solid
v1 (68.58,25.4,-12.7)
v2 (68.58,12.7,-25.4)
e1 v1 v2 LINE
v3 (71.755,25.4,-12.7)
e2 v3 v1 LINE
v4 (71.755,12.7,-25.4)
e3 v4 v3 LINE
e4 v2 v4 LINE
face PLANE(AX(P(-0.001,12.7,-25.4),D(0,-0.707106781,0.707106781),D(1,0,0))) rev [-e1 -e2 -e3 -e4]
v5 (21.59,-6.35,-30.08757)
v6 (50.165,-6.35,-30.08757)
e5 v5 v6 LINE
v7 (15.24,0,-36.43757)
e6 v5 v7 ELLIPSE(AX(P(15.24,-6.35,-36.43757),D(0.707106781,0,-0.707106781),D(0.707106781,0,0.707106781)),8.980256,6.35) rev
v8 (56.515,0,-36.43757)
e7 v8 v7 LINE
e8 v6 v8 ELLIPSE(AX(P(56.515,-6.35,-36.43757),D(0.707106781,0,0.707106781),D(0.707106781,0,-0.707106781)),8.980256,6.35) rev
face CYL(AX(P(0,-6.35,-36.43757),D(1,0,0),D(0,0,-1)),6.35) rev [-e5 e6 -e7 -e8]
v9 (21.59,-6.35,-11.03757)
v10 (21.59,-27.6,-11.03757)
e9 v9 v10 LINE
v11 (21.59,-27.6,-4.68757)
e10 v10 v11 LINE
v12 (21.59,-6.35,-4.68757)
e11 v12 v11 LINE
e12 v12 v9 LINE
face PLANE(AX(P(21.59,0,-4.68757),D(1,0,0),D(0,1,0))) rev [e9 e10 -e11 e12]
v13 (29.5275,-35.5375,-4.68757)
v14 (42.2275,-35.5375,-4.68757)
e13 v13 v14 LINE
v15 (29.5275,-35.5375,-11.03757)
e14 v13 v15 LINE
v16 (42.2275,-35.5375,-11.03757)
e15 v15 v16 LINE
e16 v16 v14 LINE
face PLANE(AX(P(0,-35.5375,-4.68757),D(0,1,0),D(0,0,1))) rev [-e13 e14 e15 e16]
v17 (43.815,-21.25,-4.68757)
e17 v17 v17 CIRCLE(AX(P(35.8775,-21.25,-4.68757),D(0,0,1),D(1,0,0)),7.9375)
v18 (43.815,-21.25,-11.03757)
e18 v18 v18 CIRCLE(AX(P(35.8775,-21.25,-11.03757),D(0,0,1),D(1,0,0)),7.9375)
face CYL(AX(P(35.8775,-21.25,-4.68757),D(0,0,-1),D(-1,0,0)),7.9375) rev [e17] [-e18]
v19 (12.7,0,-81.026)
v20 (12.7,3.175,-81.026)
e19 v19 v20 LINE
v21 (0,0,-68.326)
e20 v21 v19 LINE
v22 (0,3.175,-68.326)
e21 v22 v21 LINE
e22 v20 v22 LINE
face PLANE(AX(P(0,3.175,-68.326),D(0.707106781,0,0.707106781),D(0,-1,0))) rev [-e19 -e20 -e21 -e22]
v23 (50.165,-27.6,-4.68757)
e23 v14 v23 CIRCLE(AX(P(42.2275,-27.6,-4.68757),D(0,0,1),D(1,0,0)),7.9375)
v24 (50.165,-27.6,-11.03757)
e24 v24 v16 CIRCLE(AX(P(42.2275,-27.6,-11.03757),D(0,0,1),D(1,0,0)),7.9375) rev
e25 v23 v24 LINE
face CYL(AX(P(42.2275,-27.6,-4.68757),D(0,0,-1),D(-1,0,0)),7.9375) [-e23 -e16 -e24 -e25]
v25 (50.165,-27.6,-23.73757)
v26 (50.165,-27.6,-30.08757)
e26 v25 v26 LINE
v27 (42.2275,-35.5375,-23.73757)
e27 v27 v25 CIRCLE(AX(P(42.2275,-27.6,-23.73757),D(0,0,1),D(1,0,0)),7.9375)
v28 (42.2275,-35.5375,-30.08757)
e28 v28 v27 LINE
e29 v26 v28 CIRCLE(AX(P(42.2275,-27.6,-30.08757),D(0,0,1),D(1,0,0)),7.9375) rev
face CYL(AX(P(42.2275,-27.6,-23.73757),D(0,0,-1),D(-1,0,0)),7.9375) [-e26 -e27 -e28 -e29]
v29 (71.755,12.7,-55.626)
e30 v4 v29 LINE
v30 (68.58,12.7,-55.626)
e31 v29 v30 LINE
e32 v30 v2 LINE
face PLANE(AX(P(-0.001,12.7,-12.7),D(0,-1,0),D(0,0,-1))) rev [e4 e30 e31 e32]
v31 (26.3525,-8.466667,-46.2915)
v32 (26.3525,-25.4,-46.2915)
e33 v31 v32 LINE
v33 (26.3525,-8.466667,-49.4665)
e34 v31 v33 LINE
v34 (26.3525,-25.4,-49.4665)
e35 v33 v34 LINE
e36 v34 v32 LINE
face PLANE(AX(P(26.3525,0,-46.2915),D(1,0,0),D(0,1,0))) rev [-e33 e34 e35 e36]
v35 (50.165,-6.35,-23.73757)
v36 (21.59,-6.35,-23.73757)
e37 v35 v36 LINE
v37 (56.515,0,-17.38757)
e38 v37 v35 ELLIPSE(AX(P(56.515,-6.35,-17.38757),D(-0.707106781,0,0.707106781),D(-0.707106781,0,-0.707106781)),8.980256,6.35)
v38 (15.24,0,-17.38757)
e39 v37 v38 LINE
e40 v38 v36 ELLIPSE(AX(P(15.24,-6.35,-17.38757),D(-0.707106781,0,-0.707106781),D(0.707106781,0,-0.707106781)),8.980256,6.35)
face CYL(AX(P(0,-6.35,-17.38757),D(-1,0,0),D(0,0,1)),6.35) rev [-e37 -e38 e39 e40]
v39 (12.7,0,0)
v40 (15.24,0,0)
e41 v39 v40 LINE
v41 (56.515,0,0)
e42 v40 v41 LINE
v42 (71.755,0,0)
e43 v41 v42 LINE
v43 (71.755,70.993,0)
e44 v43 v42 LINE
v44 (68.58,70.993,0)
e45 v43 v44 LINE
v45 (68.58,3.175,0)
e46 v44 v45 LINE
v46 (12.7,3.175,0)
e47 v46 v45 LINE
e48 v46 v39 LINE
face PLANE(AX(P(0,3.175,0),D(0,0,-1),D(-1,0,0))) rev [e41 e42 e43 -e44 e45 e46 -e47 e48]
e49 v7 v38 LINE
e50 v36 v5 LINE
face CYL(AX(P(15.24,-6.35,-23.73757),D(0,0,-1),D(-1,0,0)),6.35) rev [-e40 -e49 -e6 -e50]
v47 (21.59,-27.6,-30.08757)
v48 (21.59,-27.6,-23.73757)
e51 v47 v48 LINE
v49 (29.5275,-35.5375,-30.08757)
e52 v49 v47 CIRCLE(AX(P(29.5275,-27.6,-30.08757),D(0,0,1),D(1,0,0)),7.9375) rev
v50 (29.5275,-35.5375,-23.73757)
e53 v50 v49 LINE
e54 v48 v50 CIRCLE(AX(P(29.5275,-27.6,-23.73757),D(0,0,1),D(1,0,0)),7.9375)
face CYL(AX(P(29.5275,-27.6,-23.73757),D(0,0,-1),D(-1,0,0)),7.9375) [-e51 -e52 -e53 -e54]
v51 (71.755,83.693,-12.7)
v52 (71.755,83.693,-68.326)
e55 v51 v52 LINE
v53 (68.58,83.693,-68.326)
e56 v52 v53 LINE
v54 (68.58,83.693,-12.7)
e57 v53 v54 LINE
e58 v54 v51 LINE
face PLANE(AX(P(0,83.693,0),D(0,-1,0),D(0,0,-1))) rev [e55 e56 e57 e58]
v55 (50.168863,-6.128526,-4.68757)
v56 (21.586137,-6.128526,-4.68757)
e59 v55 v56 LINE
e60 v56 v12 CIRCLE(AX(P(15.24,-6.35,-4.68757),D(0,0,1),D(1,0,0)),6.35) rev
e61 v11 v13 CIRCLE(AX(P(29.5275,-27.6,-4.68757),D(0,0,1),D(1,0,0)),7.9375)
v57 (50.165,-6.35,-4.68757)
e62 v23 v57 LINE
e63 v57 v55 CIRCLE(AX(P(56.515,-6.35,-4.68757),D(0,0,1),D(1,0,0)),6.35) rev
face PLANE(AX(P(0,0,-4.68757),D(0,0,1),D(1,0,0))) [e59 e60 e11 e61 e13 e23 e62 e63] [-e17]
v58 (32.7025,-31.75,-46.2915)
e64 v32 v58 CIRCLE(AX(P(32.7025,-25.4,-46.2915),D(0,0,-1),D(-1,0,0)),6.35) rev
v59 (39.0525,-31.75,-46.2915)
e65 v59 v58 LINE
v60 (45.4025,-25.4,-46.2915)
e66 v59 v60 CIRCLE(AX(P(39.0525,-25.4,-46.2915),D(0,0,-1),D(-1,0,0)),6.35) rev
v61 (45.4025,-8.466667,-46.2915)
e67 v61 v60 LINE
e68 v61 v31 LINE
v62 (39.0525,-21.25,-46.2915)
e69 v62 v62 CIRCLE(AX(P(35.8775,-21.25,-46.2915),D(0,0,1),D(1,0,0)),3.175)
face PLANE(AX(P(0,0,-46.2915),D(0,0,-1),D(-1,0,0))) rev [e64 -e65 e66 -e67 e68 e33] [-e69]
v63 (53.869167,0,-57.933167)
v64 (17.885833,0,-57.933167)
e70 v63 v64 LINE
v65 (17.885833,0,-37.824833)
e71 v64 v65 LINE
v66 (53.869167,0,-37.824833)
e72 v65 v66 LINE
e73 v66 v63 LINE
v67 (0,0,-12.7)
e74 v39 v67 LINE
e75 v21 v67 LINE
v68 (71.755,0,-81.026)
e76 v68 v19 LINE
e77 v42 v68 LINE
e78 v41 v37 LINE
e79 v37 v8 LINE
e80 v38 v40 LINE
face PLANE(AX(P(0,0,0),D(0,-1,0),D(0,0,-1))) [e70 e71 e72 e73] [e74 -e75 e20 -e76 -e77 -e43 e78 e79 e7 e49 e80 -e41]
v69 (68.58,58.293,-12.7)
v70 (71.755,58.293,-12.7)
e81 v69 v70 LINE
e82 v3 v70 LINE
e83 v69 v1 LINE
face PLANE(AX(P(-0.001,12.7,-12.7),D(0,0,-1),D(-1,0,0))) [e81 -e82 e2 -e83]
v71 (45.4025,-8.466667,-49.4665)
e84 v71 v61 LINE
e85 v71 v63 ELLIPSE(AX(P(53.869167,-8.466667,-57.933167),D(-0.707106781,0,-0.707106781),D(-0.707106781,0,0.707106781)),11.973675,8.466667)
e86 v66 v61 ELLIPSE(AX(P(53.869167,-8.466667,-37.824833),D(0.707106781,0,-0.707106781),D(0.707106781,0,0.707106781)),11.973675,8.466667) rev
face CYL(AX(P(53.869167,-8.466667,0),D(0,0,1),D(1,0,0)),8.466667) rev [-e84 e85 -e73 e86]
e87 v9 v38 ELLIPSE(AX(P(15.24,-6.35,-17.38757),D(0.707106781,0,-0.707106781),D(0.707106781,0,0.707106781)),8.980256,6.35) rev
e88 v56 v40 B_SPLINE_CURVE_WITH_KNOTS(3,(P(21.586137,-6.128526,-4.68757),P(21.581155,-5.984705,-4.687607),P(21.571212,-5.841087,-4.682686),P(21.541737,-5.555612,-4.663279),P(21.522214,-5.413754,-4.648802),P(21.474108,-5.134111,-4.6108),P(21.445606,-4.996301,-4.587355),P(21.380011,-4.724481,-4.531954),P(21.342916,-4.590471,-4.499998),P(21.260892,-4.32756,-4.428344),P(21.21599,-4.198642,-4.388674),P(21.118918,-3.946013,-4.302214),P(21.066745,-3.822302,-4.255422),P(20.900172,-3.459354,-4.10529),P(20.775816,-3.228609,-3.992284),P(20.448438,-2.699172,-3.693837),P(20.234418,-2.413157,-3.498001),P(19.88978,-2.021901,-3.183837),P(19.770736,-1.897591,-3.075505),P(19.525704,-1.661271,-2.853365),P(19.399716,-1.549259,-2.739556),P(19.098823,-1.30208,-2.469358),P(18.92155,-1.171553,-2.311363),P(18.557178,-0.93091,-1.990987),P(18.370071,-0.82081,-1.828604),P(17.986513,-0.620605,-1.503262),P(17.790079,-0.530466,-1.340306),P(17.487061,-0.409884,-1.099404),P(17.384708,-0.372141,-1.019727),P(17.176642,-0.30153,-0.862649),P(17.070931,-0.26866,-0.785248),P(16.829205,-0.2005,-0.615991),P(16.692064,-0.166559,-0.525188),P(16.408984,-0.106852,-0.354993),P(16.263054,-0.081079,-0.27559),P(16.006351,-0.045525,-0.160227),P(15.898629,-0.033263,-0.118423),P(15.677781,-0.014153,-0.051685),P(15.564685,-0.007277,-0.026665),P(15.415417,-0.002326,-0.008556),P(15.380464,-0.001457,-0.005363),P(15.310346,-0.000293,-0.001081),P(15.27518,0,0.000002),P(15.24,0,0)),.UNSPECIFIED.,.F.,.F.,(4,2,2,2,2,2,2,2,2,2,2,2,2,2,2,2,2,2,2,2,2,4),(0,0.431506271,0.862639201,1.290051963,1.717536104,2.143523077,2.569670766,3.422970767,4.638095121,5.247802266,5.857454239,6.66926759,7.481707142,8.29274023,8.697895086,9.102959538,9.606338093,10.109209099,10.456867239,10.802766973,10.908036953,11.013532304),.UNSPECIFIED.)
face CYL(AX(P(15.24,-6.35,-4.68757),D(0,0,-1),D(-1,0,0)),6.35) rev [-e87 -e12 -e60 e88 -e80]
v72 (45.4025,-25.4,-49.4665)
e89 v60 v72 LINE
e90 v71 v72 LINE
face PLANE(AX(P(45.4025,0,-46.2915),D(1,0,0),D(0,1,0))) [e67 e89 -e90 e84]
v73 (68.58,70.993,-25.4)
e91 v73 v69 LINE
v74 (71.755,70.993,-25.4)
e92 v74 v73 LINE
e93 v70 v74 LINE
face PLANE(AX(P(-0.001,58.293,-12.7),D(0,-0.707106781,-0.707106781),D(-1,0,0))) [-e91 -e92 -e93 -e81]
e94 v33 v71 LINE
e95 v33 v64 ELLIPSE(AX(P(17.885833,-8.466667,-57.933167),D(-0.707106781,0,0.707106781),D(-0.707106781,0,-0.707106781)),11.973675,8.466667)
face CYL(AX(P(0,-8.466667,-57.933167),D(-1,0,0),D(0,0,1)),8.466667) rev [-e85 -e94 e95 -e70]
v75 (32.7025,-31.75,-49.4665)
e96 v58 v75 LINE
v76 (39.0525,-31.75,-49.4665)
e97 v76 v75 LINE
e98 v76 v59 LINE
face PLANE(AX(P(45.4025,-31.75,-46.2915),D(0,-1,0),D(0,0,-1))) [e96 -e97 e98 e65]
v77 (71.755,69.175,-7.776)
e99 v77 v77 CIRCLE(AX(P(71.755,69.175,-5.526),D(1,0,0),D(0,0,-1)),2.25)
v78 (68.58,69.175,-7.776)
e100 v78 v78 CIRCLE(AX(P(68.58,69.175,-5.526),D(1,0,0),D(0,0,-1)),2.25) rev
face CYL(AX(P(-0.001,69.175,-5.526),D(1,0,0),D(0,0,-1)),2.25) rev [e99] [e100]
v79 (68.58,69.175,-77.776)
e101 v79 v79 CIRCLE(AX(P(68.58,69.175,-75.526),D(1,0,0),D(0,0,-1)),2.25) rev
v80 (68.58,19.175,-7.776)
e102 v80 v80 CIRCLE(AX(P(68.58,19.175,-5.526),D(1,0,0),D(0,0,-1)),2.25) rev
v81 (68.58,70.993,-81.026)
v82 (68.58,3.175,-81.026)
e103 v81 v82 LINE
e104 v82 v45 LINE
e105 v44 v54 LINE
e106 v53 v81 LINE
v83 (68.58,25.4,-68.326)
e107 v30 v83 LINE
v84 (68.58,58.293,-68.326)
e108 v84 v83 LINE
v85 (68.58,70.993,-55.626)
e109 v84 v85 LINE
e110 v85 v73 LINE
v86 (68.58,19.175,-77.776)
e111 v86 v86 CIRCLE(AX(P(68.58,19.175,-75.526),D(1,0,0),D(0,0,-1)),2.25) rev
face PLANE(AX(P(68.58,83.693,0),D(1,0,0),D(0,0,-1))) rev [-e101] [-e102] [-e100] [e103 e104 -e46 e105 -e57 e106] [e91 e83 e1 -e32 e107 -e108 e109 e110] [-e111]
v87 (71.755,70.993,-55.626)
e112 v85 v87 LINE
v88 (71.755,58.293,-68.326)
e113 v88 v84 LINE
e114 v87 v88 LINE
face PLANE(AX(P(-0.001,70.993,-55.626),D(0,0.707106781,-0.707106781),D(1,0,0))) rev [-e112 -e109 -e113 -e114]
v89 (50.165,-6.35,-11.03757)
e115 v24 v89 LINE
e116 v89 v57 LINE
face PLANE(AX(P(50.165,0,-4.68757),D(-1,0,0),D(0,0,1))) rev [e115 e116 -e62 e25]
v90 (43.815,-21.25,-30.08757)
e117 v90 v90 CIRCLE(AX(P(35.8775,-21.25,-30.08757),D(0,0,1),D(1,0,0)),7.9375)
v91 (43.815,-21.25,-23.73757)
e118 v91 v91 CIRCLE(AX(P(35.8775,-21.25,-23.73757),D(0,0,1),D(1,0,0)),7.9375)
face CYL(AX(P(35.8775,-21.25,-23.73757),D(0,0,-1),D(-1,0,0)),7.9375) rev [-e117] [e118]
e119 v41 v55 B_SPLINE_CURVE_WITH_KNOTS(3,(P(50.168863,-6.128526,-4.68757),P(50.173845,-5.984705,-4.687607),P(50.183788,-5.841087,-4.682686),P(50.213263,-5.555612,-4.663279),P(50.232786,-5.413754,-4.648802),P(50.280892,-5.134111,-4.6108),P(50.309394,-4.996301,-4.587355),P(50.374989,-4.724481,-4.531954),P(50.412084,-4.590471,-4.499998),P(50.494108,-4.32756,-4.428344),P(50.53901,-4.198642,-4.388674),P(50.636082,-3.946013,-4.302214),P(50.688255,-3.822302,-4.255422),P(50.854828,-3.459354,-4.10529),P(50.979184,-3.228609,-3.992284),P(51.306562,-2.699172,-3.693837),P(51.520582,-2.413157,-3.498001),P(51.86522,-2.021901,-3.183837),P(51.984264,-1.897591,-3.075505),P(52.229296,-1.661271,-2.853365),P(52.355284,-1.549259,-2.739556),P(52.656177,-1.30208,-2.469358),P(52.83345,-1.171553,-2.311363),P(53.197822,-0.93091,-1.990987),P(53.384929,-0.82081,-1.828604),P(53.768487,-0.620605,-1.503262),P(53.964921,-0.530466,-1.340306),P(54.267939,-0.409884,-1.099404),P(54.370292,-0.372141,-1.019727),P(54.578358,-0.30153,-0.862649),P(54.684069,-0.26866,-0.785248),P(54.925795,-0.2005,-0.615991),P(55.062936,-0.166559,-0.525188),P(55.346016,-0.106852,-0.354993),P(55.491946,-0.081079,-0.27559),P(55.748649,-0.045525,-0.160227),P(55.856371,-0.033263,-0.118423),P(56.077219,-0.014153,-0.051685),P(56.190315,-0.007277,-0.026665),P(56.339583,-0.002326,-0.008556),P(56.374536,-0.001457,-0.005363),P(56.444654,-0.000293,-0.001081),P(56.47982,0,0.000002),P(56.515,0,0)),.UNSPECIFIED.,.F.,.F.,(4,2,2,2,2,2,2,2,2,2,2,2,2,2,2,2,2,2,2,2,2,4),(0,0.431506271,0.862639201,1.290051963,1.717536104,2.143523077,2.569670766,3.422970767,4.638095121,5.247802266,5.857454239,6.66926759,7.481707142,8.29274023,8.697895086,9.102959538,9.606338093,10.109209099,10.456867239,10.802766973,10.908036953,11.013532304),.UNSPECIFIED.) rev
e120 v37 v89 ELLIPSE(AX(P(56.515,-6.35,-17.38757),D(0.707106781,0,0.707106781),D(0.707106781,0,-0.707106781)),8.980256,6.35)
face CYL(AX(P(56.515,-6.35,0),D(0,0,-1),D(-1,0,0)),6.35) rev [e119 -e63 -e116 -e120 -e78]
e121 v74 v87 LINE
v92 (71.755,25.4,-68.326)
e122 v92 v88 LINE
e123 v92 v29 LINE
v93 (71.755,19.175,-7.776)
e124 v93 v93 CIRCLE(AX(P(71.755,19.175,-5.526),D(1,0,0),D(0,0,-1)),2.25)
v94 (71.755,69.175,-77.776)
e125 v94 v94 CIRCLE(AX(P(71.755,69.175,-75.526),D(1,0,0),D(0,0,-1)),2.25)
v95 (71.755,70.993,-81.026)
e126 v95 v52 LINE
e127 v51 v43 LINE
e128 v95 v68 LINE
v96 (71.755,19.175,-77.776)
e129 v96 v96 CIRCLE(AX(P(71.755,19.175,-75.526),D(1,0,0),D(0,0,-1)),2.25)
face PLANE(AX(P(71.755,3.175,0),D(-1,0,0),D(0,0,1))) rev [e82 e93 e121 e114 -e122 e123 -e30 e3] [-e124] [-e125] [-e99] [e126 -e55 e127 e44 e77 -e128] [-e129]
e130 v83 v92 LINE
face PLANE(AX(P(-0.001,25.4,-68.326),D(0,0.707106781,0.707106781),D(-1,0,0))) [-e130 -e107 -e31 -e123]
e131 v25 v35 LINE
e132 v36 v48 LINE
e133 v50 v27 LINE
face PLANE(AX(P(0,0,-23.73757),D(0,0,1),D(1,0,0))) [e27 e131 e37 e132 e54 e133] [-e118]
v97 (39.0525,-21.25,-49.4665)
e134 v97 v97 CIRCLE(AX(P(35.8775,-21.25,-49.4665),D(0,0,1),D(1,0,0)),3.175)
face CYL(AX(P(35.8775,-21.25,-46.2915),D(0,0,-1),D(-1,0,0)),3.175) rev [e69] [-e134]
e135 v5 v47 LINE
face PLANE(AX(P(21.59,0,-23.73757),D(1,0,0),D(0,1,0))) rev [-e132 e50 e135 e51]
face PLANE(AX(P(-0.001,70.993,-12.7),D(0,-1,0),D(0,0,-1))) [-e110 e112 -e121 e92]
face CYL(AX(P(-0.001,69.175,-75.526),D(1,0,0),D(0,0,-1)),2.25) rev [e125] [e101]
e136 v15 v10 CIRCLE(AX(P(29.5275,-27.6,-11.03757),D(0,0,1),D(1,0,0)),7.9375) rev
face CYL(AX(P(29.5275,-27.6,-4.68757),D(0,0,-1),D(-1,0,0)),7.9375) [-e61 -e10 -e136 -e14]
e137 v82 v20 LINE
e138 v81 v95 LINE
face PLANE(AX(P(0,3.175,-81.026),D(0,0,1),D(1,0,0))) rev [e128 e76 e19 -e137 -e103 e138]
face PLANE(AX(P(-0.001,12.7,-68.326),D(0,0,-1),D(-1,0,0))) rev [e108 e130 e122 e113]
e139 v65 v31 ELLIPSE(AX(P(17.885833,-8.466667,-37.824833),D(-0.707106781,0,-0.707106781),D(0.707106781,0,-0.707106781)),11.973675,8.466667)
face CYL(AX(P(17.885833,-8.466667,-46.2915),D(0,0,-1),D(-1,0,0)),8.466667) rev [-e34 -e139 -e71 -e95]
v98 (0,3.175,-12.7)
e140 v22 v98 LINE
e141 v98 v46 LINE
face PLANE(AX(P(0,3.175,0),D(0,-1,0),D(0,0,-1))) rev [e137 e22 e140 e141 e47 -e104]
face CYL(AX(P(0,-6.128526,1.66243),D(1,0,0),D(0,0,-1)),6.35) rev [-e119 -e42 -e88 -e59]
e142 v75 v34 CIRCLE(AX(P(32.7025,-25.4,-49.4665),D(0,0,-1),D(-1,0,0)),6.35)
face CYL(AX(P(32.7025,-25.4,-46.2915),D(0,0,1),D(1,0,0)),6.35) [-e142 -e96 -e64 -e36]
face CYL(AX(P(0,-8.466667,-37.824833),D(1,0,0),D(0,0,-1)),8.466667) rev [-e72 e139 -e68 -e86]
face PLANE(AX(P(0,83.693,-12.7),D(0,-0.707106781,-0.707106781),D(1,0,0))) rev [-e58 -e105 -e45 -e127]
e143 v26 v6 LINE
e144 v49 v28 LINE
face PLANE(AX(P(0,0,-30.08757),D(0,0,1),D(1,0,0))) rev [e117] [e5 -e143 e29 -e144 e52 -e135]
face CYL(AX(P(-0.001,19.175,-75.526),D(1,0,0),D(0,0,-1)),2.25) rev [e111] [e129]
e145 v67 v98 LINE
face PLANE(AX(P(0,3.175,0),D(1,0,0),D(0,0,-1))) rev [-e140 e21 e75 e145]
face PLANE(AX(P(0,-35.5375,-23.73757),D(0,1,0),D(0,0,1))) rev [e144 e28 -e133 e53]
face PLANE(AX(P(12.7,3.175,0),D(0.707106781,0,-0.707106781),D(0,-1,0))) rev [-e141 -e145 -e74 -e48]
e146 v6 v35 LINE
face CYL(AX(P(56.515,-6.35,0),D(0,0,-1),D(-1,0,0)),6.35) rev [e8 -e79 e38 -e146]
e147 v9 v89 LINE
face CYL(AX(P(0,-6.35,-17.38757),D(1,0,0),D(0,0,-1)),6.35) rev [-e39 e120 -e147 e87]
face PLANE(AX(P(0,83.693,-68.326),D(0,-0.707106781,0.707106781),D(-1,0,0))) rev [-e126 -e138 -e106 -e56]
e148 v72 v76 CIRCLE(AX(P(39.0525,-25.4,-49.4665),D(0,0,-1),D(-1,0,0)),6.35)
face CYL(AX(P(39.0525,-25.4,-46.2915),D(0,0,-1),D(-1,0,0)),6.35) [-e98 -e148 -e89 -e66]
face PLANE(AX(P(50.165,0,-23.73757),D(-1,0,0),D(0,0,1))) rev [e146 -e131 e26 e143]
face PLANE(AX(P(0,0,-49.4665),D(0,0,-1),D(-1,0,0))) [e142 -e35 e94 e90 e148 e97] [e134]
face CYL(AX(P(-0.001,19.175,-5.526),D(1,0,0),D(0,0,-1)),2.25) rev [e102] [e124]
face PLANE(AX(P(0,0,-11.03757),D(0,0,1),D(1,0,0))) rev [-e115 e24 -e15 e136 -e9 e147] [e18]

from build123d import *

# Parameters (mm, degrees)
SKETCH1_W            = 71.755
SKETCH1_H            = 81.026
BOSS_EXTRUDE1_DEPTH  = 3.175
BOSS_EXTRUDE4_DEPTH  = 80.51799999999999
BOSS_EXTRUDE10_START = -7.366
SKETCH8_R            = 3.174999999999998
BOSS_EXTRUDE10_DEPTH = 1.5875
FILLET1_R            = 6.35
FILLET2_R            = 8.466666666666665
CUT_EXTRUDE1_REACH   = 138.816
SKETCH9_W            = 55.626000000000005
SKETCH9_H            = 58.29299999999998
FILLET3_SIZE         = 12.7
CHAMFER1_SIZE        = 12.7
BOSS_EXTRUDE11_START = -11.03757
SKETCH10_R           = 7.937500000000002
BOSS_EXTRUDE11_DEPTH = 6.35
LPATTERN1_COUNT      = 2
LPATTERN1_PITCH      = 19.049999999999997
FILLET4_R            = 6.35
FILLET5_R            = 7.9375
CUT_EXTRUDE2_REACH   = 138.816
SKETCH13_R           = 2.2499999999999964
SKETCH13_R_2         = 2.2500000000000013


with BuildPart() as part:
    # Sketch1 → Boss-Extrude1 (new body)
    with BuildSketch(Plane(origin=(0, 0, 0), x_dir=(1, 0, 0), z_dir=(0, 1, 0))):
        with Locations((35.8775, 40.513)):
            Rectangle(SKETCH1_W, SKETCH1_H)
    extrude(amount=BOSS_EXTRUDE1_DEPTH)

    # Sketch3 → Boss-Extrude4 (add)
    with BuildSketch(Plane(origin=(0, 3.175, 0), x_dir=(1, 0, 0), z_dir=(0, 1, 0))):
        Polygon((71.755, 0), (68.58, -3.9e-16), (68.58, 81.026), (71.755, 81.026), align=None)
    extrude(amount=BOSS_EXTRUDE4_DEPTH)

    # Sketch8 → Boss-Extrude10 (add, symmetric)
    with BuildSketch(Plane.XY.offset(-40.513).offset(BOSS_EXTRUDE10_START)):
        Polygon((26.3525, 0), (26.352499999999996, -31.75), (45.4025, -31.75), (45.402499999999996, 0), align=None)
        with Locations((35.8775, -21.249999999999993)):
            Circle(SKETCH8_R, mode=Mode.SUBTRACT)
    extrude(amount=BOSS_EXTRUDE10_DEPTH, both=True)

    # Fillet1
    fillet1_edges = [part.edges().sort_by_distance(p)[0] for p in [
        (26.352499999999996, -31.75, -47.879),
        (45.4025, -31.75, -47.879),
    ]]
    fillet(fillet1_edges, radius=FILLET1_R)

    # Fillet2
    fillet2_edges = [part.edges().sort_by_distance(p)[0] for p in [
        (35.8775, 0, -49.466499999999996),
        (26.3525, 0, -47.879),
        (35.8775, 0, -46.2915),
        (45.402499999999996, 0, -47.879),
    ]]
    fillet(fillet2_edges, radius=FILLET2_R)

    # Sketch9 → Cut-Extrude1 (cut, up to next)
    with BuildSketch(Plane(origin=(71.755, 0, 0), x_dir=(0, 0, -1), z_dir=(1, 0, 0)), mode=Mode.PRIVATE) as cut_extrude1_sk1:
        with Locations((40.513000000000005, 41.84649999999999)):
            Rectangle(SKETCH9_W, SKETCH9_H)
    cut_extrude1_tool1 = extrude(cut_extrude1_sk1.sketch, amount=-CUT_EXTRUDE1_REACH, mode=Mode.PRIVATE) & part.part
    add(cut_extrude1_tool1.solids().sort_by_distance((71.755, 41.8465, -40.513))[0], mode=Mode.SUBTRACT)

    # Fillet3
    fillet3_edges = [part.edges().sort_by_distance(p)[0] for p in [
        (70.16749999999999, 83.69299999999998, -81.026),
        (70.16749999999999, 83.69299999999998, 1.9e-16),
        (0, 1.5875, -81.026),
        (0, 1.5875, 0),
    ]]
    chamfer(fillet3_edges, length=FILLET3_SIZE)

    # Chamfer1
    chamfer1_edges = [part.edges().sort_by_distance(p)[0] for p in [
        (70.16749999999999, 70.99299999999998, -12.700000000000003),
        (70.16749999999999, 70.99299999999998, -68.32600000000001),
        (70.16749999999999, 12.700000000000006, -68.32600000000001),
        (70.16749999999999, 12.700000000000006, -12.700000000000003),
    ]]
    chamfer(chamfer1_edges, length=CHAMFER1_SIZE)

    # Sketch10 → Boss-Extrude11 (add)
    with BuildSketch(Plane.XY.offset(BOSS_EXTRUDE11_START)):
        Polygon((21.589999999999996, 0), (21.59, -35.537499999999994), (50.165, -35.537499999999994), (50.165, 0), align=None)
        with Locations((35.8775, -21.249999999999993)):
            Circle(SKETCH10_R, mode=Mode.SUBTRACT)
    boss_extrude11 = extrude(amount=BOSS_EXTRUDE11_DEPTH)

    # LPattern1: Boss-Extrude11 ×2
    with Locations(*[(0, 0, -i * LPATTERN1_PITCH) for i in range(1, LPATTERN1_COUNT)]):
        add(boss_extrude11)

    # Fillet4
    # the kernel refuses this fillet: 6.35 mm, written as the material it adds along each edge
    with BuildSketch(Plane(origin=(50.165, 0, -4.687570000000001), x_dir=(0, 1.9e-16, 1), z_dir=(-1, 0, 0))) as fillet4_piece_1:
        with BuildLine():
            CenterArc((6.349999999999999, -6.128525637957305), FILLET4_R, 105.17689462009754, 74.82310537990246)
            Line((-1.16e-15, -6.1285256379573045), (-0.12700000000000095, -6.1285256379573045))
            Line((-0.12700000000000095, -6.1285256379573045), (-0.12699999999999978, 2e-17))
            Line((-0.12699999999999978, 2e-17), (2e-17, 0.127))
            ThreePointArc((2e-17, 0.127), (2.343784999999997, 0.12699999999999956), (4.654321400000001, 0.12257051275914613))
            Line((4.654321400000001, 0.12257051275914613), (4.687570000000001, 0))
        make_face()
    extrude(amount=28.575000000000003)
    with BuildSketch(Plane(origin=(50.165, 0, -26.912570000000006), x_dir=(1, 0, 0), z_dir=(0, 0, 1))) as fillet4_piece_2_section:
        with BuildLine():
            CenterArc((FILLET4_R, -FILLET4_R), FILLET4_R, 90, 90)
            Line((0, -FILLET4_R), (-FILLET4_R * 0.02, -FILLET4_R))
            Line((-FILLET4_R * 0.02, -FILLET4_R), (-FILLET4_R * 0.02, FILLET4_R * 0.02))
            Line((-FILLET4_R * 0.02, FILLET4_R * 0.02), (FILLET4_R, FILLET4_R * 0.02))
            Line((FILLET4_R, FILLET4_R * 0.02), (FILLET4_R, 0))
        make_face()
    fillet4_piece_2 = extrude(amount=22.225000000000005, mode=Mode.PRIVATE)
    fillet4_piece_2 = split(fillet4_piece_2, bisect_by=Plane(origin=(51.602608975594336, -1.437608975594344, -23.737569999999998), z_dir=(0, 0, -1)), keep=Keep.TOP, mode=Mode.PRIVATE)
    add(fillet4_piece_2)
    with BuildSketch(Plane(origin=(50.165, 0, -11.03757), x_dir=(1, 0, 0), z_dir=(0, 0, 1))) as fillet4_piece_3:
        with BuildLine():
            CenterArc((FILLET4_R, -FILLET4_R), FILLET4_R, 90, 90)
            Line((0, -FILLET4_R), (-FILLET4_R * 0.02, -FILLET4_R))
            Line((-FILLET4_R * 0.02, -FILLET4_R), (-FILLET4_R * 0.02, FILLET4_R * 0.02))
            Line((-FILLET4_R * 0.02, FILLET4_R * 0.02), (FILLET4_R, FILLET4_R * 0.02))
            Line((FILLET4_R, FILLET4_R * 0.02), (FILLET4_R, 0))
        make_face()
    extrude(amount=6.35)
    with BuildSketch(Plane(origin=(21.589999999999996, 0, -26.912569999999995), x_dir=(-1, 0, 0), z_dir=(0, 0, 1))) as fillet4_piece_4_section:
        with BuildLine():
            CenterArc((FILLET4_R, FILLET4_R), FILLET4_R, 180, 90)
            Line((0, FILLET4_R), (-FILLET4_R * 0.02, FILLET4_R))
            Line((-FILLET4_R * 0.02, FILLET4_R), (-FILLET4_R * 0.02, -FILLET4_R * 0.02))
            Line((-FILLET4_R * 0.02, -FILLET4_R * 0.02), (FILLET4_R, -FILLET4_R * 0.02))
            Line((FILLET4_R, -FILLET4_R * 0.02), (FILLET4_R, 0))
        make_face()
    fillet4_piece_4 = extrude(amount=22.224999999999994, mode=Mode.PRIVATE)
    fillet4_piece_4 = split(fillet4_piece_4, bisect_by=Plane(origin=(20.152391024405652, -1.4376089755943404, -23.737569999999998), z_dir=(0, 0, -1)), keep=Keep.TOP, mode=Mode.PRIVATE)
    add(fillet4_piece_4)
    with BuildSketch(Plane(origin=(21.589999999999996, 0, -11.03757), x_dir=(-1, 0, 0), z_dir=(0, 0, 1))) as fillet4_piece_5:
        with BuildLine():
            CenterArc((FILLET4_R, FILLET4_R), FILLET4_R, 180, 90)
            Line((0, FILLET4_R), (-FILLET4_R * 0.02, FILLET4_R))
            Line((-FILLET4_R * 0.02, FILLET4_R), (-FILLET4_R * 0.02, -FILLET4_R * 0.02))
            Line((-FILLET4_R * 0.02, -FILLET4_R * 0.02), (FILLET4_R, -FILLET4_R * 0.02))
            Line((FILLET4_R, -FILLET4_R * 0.02), (FILLET4_R, 0))
        make_face()
    extrude(amount=6.35)
    with BuildSketch(Plane(origin=(50.165, 0, -11.03757), x_dir=(0, 0, -1), z_dir=(-1, 0, 0))) as fillet4_piece_6:
        with BuildLine():
            CenterArc((FILLET4_R, FILLET4_R), FILLET4_R, 180, 90)
            Line((0, FILLET4_R), (-FILLET4_R * 0.02, FILLET4_R))
            Line((-FILLET4_R * 0.02, FILLET4_R), (-FILLET4_R * 0.02, -FILLET4_R * 0.02))
            Line((-FILLET4_R * 0.02, -FILLET4_R * 0.02), (FILLET4_R, -FILLET4_R * 0.02))
            Line((FILLET4_R, -FILLET4_R * 0.02), (FILLET4_R, 0))
        make_face()
    extrude(amount=28.575000000000003)
    with BuildSketch(Plane(origin=(50.165, 0, -23.737569999999998), x_dir=(0, 0, 1), z_dir=(-1, 0, 0))) as fillet4_piece_7:
        with BuildLine():
            CenterArc((FILLET4_R, -FILLET4_R), FILLET4_R, 90, 90)
            Line((0, -FILLET4_R), (-FILLET4_R * 0.02, -FILLET4_R))
            Line((-FILLET4_R * 0.02, -FILLET4_R), (-FILLET4_R * 0.02, FILLET4_R * 0.02))
            Line((-FILLET4_R * 0.02, FILLET4_R * 0.02), (FILLET4_R, FILLET4_R * 0.02))
            Line((FILLET4_R, FILLET4_R * 0.02), (FILLET4_R, 0))
        make_face()
    extrude(amount=28.575000000000003)
    with BuildSketch(Plane(origin=(50.165, 0, -30.08757), x_dir=(1, 0, 0), z_dir=(0, 0, 1))) as fillet4_piece_8:
        with BuildLine():
            CenterArc((FILLET4_R, -FILLET4_R), FILLET4_R, 90, 90)
            Line((0, -FILLET4_R), (-FILLET4_R * 0.02, -FILLET4_R))
            Line((-FILLET4_R * 0.02, -FILLET4_R), (-FILLET4_R * 0.02, FILLET4_R * 0.02))
            Line((-FILLET4_R * 0.02, FILLET4_R * 0.02), (FILLET4_R, FILLET4_R * 0.02))
            Line((FILLET4_R, FILLET4_R * 0.02), (FILLET4_R, 0))
        make_face()
    extrude(amount=6.350000000000001)
    with BuildSketch(Plane(origin=(50.165, 0, -30.08757), x_dir=(1, 0, 0), z_dir=(0, 0, 1))) as fillet4_piece_9_section:
        with BuildLine():
            CenterArc((FILLET4_R, -FILLET4_R), FILLET4_R, 90, 90)
            Line((0, -FILLET4_R), (-FILLET4_R * 0.02, -FILLET4_R))
            Line((-FILLET4_R * 0.02, -FILLET4_R), (-FILLET4_R * 0.02, FILLET4_R * 0.02))
            Line((-FILLET4_R * 0.02, FILLET4_R * 0.02), (FILLET4_R, FILLET4_R * 0.02))
            Line((FILLET4_R, FILLET4_R * 0.02), (FILLET4_R, 0))
        make_face()
    fillet4_piece_9 = extrude(amount=22.225, mode=Mode.PRIVATE)
    fillet4_piece_9 = split(fillet4_piece_9, bisect_by=Plane(origin=(51.602608975594336, -1.437608975594344, -11.03757), z_dir=(0, 0, 1)), keep=Keep.TOP, mode=Mode.PRIVATE)
    add(fillet4_piece_9)
    with BuildSketch(Plane(origin=(21.589999999999996, 0, -30.08757), x_dir=(-1, 0, 0), z_dir=(0, 0, 1))) as fillet4_piece_10:
        with BuildLine():
            CenterArc((FILLET4_R, FILLET4_R), FILLET4_R, 180, 90)
            Line((0, FILLET4_R), (-FILLET4_R * 0.02, FILLET4_R))
            Line((-FILLET4_R * 0.02, FILLET4_R), (-FILLET4_R * 0.02, -FILLET4_R * 0.02))
            Line((-FILLET4_R * 0.02, -FILLET4_R * 0.02), (FILLET4_R, -FILLET4_R * 0.02))
            Line((FILLET4_R, -FILLET4_R * 0.02), (FILLET4_R, 0))
        make_face()
    extrude(amount=6.350000000000001)
    with BuildSketch(Plane(origin=(21.589999999999996, 0, -30.08757), x_dir=(-1, 0, 0), z_dir=(0, 0, 1))) as fillet4_piece_11_section:
        with BuildLine():
            CenterArc((FILLET4_R, FILLET4_R), FILLET4_R, 180, 90)
            Line((0, FILLET4_R), (-FILLET4_R * 0.02, FILLET4_R))
            Line((-FILLET4_R * 0.02, FILLET4_R), (-FILLET4_R * 0.02, -FILLET4_R * 0.02))
            Line((-FILLET4_R * 0.02, -FILLET4_R * 0.02), (FILLET4_R, -FILLET4_R * 0.02))
            Line((FILLET4_R, -FILLET4_R * 0.02), (FILLET4_R, 0))
        make_face()
    fillet4_piece_11 = extrude(amount=22.224999999999994, mode=Mode.PRIVATE)
    fillet4_piece_11 = split(fillet4_piece_11, bisect_by=Plane(origin=(20.15239102440566, -1.4376089755943369, -11.03757), z_dir=(0, 0, 1)), keep=Keep.TOP, mode=Mode.PRIVATE)
    add(fillet4_piece_11)
    with BuildSketch(Plane(origin=(50.165, 0, -30.08757), x_dir=(0, 0, -1), z_dir=(-1, 0, 0))) as fillet4_piece_12:
        with BuildLine():
            CenterArc((FILLET4_R, FILLET4_R), FILLET4_R, 180, 90)
            Line((0, FILLET4_R), (-FILLET4_R * 0.02, FILLET4_R))
            Line((-FILLET4_R * 0.02, FILLET4_R), (-FILLET4_R * 0.02, -FILLET4_R * 0.02))
            Line((-FILLET4_R * 0.02, -FILLET4_R * 0.02), (FILLET4_R, -FILLET4_R * 0.02))
            Line((FILLET4_R, -FILLET4_R * 0.02), (FILLET4_R, 0))
        make_face()
    extrude(amount=28.575000000000003)
    with BuildSketch(Plane(origin=(65.48631409489326, 0, -4.687570000000001), x_dir=(0, 1.9e-16, 1), z_dir=(-1, 0, 0))) as fillet4_piece_13a_section:
        with BuildLine():
            CenterArc((6.349999999999999, -6.128525637957305), FILLET4_R, 105.17689462009754, 74.82310537990246)
            Line((-1.16e-15, -6.1285256379573045), (-0.12700000000000095, -6.1285256379573045))
            Line((-0.12700000000000095, -6.1285256379573045), (-0.12699999999999978, 2e-17))
            Line((-0.12699999999999978, 2e-17), (2e-17, 0.127))
            ThreePointArc((2e-17, 0.127), (2.343784999999997, 0.12699999999999956), (4.654321400000001, 0.12257051275914613))
            Line((4.654321400000001, 0.12257051275914613), (4.687570000000001, 0))
        make_face()
    fillet4_piece_13a = extrude(amount=43.89631409489326, mode=Mode.PRIVATE)
    fillet4_piece_13a = split(fillet4_piece_13a, bisect_by=Plane(origin=(50.165, -1.4475131983236835, -3.4994164368290797), z_dir=(1, 0, 0)), keep=Keep.TOP, mode=Mode.PRIVATE)
    with BuildSketch(Plane(origin=(50.165, 0, -11.03757), x_dir=(1, 0, 0), z_dir=(0, 0, 1))) as fillet4_piece_13b_section:
        with BuildLine():
            CenterArc((FILLET4_R, -FILLET4_R), FILLET4_R, 90, 90)
            Line((0, -FILLET4_R), (-FILLET4_R * 0.02, -FILLET4_R))
            Line((-FILLET4_R * 0.02, -FILLET4_R), (-FILLET4_R * 0.02, FILLET4_R * 0.02))
            Line((-FILLET4_R * 0.02, FILLET4_R * 0.02), (FILLET4_R, FILLET4_R * 0.02))
            Line((FILLET4_R, FILLET4_R * 0.02), (FILLET4_R, 0))
        make_face()
    fillet4_piece_13b = extrude(amount=22.225000000000005, mode=Mode.PRIVATE)
    fillet4_piece_13b = split(fillet4_piece_13b, bisect_by=Plane(origin=(51.60260897559435, -1.4376089755943449, 0), z_dir=(0, 0, -1)), keep=Keep.TOP, mode=Mode.PRIVATE)
    fillet4_piece_13b = split(fillet4_piece_13b, bisect_by=Plane(origin=(51.60260897559435, -1.437608975594344, -4.687570000000001), z_dir=(0, 0, 1)), keep=Keep.TOP, mode=Mode.PRIVATE)
    fillet4_piece_13 = fillet4_piece_13a & fillet4_piece_13b
    add(fillet4_piece_13)
    with BuildSketch(Plane(origin=(21.589999999999996, 0, -11.03757), x_dir=(-1, 0, 0), z_dir=(0, 0, 1))) as fillet4_piece_14a_section:
        with BuildLine():
            CenterArc((FILLET4_R, FILLET4_R), FILLET4_R, 180, 90)
            Line((0, FILLET4_R), (-FILLET4_R * 0.02, FILLET4_R))
            Line((-FILLET4_R * 0.02, FILLET4_R), (-FILLET4_R * 0.02, -FILLET4_R * 0.02))
            Line((-FILLET4_R * 0.02, -FILLET4_R * 0.02), (FILLET4_R, -FILLET4_R * 0.02))
            Line((FILLET4_R, -FILLET4_R * 0.02), (FILLET4_R, 0))
        make_face()
    fillet4_piece_14a = extrude(amount=22.224999999999994, mode=Mode.PRIVATE)
    fillet4_piece_14a = split(fillet4_piece_14a, bisect_by=Plane(origin=(20.152391024405656, -1.4376089755943378, 0), z_dir=(0, 0, -1)), keep=Keep.TOP, mode=Mode.PRIVATE)
    fillet4_piece_14a = split(fillet4_piece_14a, bisect_by=Plane(origin=(20.152391024405656, -1.4376089755943369, -4.687570000000001), z_dir=(0, 0, 1)), keep=Keep.TOP, mode=Mode.PRIVATE)
    with BuildSketch(Plane(origin=(50.165, 0, -4.687570000000001), x_dir=(0, 1.9e-16, 1), z_dir=(-1, 0, 0))) as fillet4_piece_14b_section:
        with BuildLine():
            CenterArc((6.349999999999999, -6.128525637957305), FILLET4_R, 105.17689462009754, 74.82310537990246)
            Line((-1.16e-15, -6.1285256379573045), (-0.12700000000000095, -6.1285256379573045))
            Line((-0.12700000000000095, -6.1285256379573045), (-0.12699999999999978, 2e-17))
            Line((-0.12699999999999978, 2e-17), (2e-17, 0.127))
            ThreePointArc((2e-17, 0.127), (2.343784999999997, 0.12699999999999956), (4.654321400000001, 0.12257051275914613))
            Line((4.654321400000001, 0.12257051275914613), (4.687570000000001, 0))
        make_face()
    fillet4_piece_14b = extrude(amount=43.896314094893256, mode=Mode.PRIVATE)
    fillet4_piece_14b = split(fillet4_piece_14b, bisect_by=Plane(origin=(12.225472193622682, -1.5171358944541156, -0.47452780637731795), z_dir=(0.7071067811865476, 0, -0.7071067811865476)), keep=Keep.TOP, mode=Mode.PRIVATE)
    fillet4_piece_14b = split(fillet4_piece_14b, bisect_by=Plane(origin=(21.589999999999996, -1.517135894454115, -3.59603707516942), z_dir=(-1, -1e-16, 0)), keep=Keep.TOP, mode=Mode.PRIVATE)
    fillet4_piece_14 = fillet4_piece_14a & fillet4_piece_14b
    add(fillet4_piece_14)
    with BuildSketch(Plane(origin=(66.03999999999999, 0, -11.037570000000002), x_dir=(0, 0, -1), z_dir=(-1, 0, 0))) as fillet4_piece_15a_section:
        with BuildLine():
            CenterArc((FILLET4_R, FILLET4_R), FILLET4_R, 180, 90)
            Line((-1.78e-15, FILLET4_R), (-FILLET4_R * 0.02, FILLET4_R))
            Line((-FILLET4_R * 0.02, FILLET4_R), (-FILLET4_R * 0.02, -FILLET4_R * 0.02))
            Line((-FILLET4_R * 0.02, -FILLET4_R * 0.02), (FILLET4_R, -FILLET4_R * 0.02))
            Line((FILLET4_R, -FILLET4_R * 0.02), (FILLET4_R, 0))
        make_face()
    fillet4_piece_15a = extrude(amount=44.449999999999996, mode=Mode.PRIVATE)
    fillet4_piece_15a = split(fillet4_piece_15a, bisect_by=Plane(origin=(50.165, -1.437608975594344, -12.475178975594343), z_dir=(1, 0, 0)), keep=Keep.TOP, mode=Mode.PRIVATE)
    with BuildSketch(Plane(origin=(50.165, 0, -26.912570000000006), x_dir=(1, 0, 0), z_dir=(0, 0, 1))) as fillet4_piece_15b_section:
        with BuildLine():
            CenterArc((FILLET4_R, -FILLET4_R), FILLET4_R, 90, 90)
            Line((0, -FILLET4_R), (-FILLET4_R * 0.02, -FILLET4_R))
            Line((-FILLET4_R * 0.02, -FILLET4_R), (-FILLET4_R * 0.02, FILLET4_R * 0.02))
            Line((-FILLET4_R * 0.02, FILLET4_R * 0.02), (FILLET4_R, FILLET4_R * 0.02))
            Line((FILLET4_R, FILLET4_R * 0.02), (FILLET4_R, 0))
        make_face()
    fillet4_piece_15b = extrude(amount=22.225000000000005, mode=Mode.PRIVATE)
    fillet4_piece_15b = split(fillet4_piece_15b, bisect_by=Plane(origin=(51.602608975594336, -1.437608975594344, -11.03757), z_dir=(0, 0, -1)), keep=Keep.TOP, mode=Mode.PRIVATE)
    fillet4_piece_15b = split(fillet4_piece_15b, bisect_by=Plane(origin=(51.602608975594336, -1.437608975594344, -23.737569999999998), z_dir=(0, 0, 1)), keep=Keep.TOP, mode=Mode.PRIVATE)
    fillet4_piece_15 = fillet4_piece_15a & fillet4_piece_15b
    add(fillet4_piece_15)
    with BuildSketch(Plane(origin=(21.589999999999996, 0, -26.912569999999995), x_dir=(-1, 0, 0), z_dir=(0, 0, 1))) as fillet4_piece_16a_section:
        with BuildLine():
            CenterArc((FILLET4_R, FILLET4_R), FILLET4_R, 180, 90)
            Line((0, FILLET4_R), (-FILLET4_R * 0.02, FILLET4_R))
            Line((-FILLET4_R * 0.02, FILLET4_R), (-FILLET4_R * 0.02, -FILLET4_R * 0.02))
            Line((-FILLET4_R * 0.02, -FILLET4_R * 0.02), (FILLET4_R, -FILLET4_R * 0.02))
            Line((FILLET4_R, -FILLET4_R * 0.02), (FILLET4_R, 0))
        make_face()
    fillet4_piece_16a = extrude(amount=22.224999999999994, mode=Mode.PRIVATE)
    fillet4_piece_16a = split(fillet4_piece_16a, bisect_by=Plane(origin=(20.152391024405656, -1.4376089755943404, -11.03757), z_dir=(0, 0, -1)), keep=Keep.TOP, mode=Mode.PRIVATE)
    fillet4_piece_16a = split(fillet4_piece_16a, bisect_by=Plane(origin=(20.152391024405656, -1.4376089755943404, -23.737569999999998), z_dir=(0, 0, 1)), keep=Keep.TOP, mode=Mode.PRIVATE)
    with BuildSketch(Plane(origin=(50.165, 0, -11.03757), x_dir=(0, 0, -1), z_dir=(-1, 0, 0))) as fillet4_piece_16b_section:
        with BuildLine():
            CenterArc((FILLET4_R, FILLET4_R), FILLET4_R, 180, 90)
            Line((0, FILLET4_R), (-FILLET4_R * 0.02, FILLET4_R))
            Line((-FILLET4_R * 0.02, FILLET4_R), (-FILLET4_R * 0.02, -FILLET4_R * 0.02))
            Line((-FILLET4_R * 0.02, -FILLET4_R * 0.02), (FILLET4_R, -FILLET4_R * 0.02))
            Line((FILLET4_R, -FILLET4_R * 0.02), (FILLET4_R, 0))
        make_face()
    fillet4_piece_16b = extrude(amount=44.449999999999996, mode=Mode.PRIVATE)
    fillet4_piece_16b = split(fillet4_piece_16b, bisect_by=Plane(origin=(21.589999999999996, -1.4376089755943406, -12.475178975594343), z_dir=(-1, -1e-16, 0)), keep=Keep.TOP, mode=Mode.PRIVATE)
    fillet4_piece_16 = fillet4_piece_16a & fillet4_piece_16b
    add(fillet4_piece_16)
    with BuildSketch(Plane(origin=(66.03999999999999, 0, -23.737569999999998), x_dir=(0, 0, 1), z_dir=(-1, 0, 0))) as fillet4_piece_17a_section:
        with BuildLine():
            CenterArc((FILLET4_R, -FILLET4_R), FILLET4_R, 90, 90)
            Line((0, -FILLET4_R), (-FILLET4_R * 0.02, -FILLET4_R))
            Line((-FILLET4_R * 0.02, -FILLET4_R), (-FILLET4_R * 0.02, FILLET4_R * 0.02))
            Line((-FILLET4_R * 0.02, FILLET4_R * 0.02), (FILLET4_R, FILLET4_R * 0.02))
            Line((FILLET4_R, FILLET4_R * 0.02), (FILLET4_R, 0))
        make_face()
    fillet4_piece_17a = extrude(amount=44.449999999999996, mode=Mode.PRIVATE)
    fillet4_piece_17a = split(fillet4_piece_17a, bisect_by=Plane(origin=(50.165, -1.4376089755943369, -22.299961024405654), z_dir=(1, 0, 0)), keep=Keep.TOP, mode=Mode.PRIVATE)
    with BuildSketch(Plane(origin=(50.165, 0, -30.08757), x_dir=(1, 0, 0), z_dir=(0, 0, 1))) as fillet4_piece_17b_section:
        with BuildLine():
            CenterArc((FILLET4_R, -FILLET4_R), FILLET4_R, 90, 90)
            Line((0, -FILLET4_R), (-FILLET4_R * 0.02, -FILLET4_R))
            Line((-FILLET4_R * 0.02, -FILLET4_R), (-FILLET4_R * 0.02, FILLET4_R * 0.02))
            Line((-FILLET4_R * 0.02, FILLET4_R * 0.02), (FILLET4_R, FILLET4_R * 0.02))
            Line((FILLET4_R, FILLET4_R * 0.02), (FILLET4_R, 0))
        make_face()
    fillet4_piece_17b = extrude(amount=22.225, mode=Mode.PRIVATE)
    fillet4_piece_17b = split(fillet4_piece_17b, bisect_by=Plane(origin=(51.60260897559434, -1.437608975594344, -11.03757), z_dir=(0, 0, -1)), keep=Keep.TOP, mode=Mode.PRIVATE)
    fillet4_piece_17b = split(fillet4_piece_17b, bisect_by=Plane(origin=(51.60260897559434, -1.437608975594344, -23.737569999999998), z_dir=(0, 0, 1)), keep=Keep.TOP, mode=Mode.PRIVATE)
    fillet4_piece_17 = fillet4_piece_17a & fillet4_piece_17b
    add(fillet4_piece_17)
    with BuildSketch(Plane(origin=(21.589999999999996, 0, -30.08757), x_dir=(-1, 0, 0), z_dir=(0, 0, 1))) as fillet4_piece_18a_section:
        with BuildLine():
            CenterArc((FILLET4_R, FILLET4_R), FILLET4_R, 180, 90)
            Line((0, FILLET4_R), (-FILLET4_R * 0.02, FILLET4_R))
            Line((-FILLET4_R * 0.02, FILLET4_R), (-FILLET4_R * 0.02, -FILLET4_R * 0.02))
            Line((-FILLET4_R * 0.02, -FILLET4_R * 0.02), (FILLET4_R, -FILLET4_R * 0.02))
            Line((FILLET4_R, -FILLET4_R * 0.02), (FILLET4_R, 0))
        make_face()
    fillet4_piece_18a = extrude(amount=22.224999999999994, mode=Mode.PRIVATE)
    fillet4_piece_18a = split(fillet4_piece_18a, bisect_by=Plane(origin=(20.152391024405656, -1.4376089755943404, -11.03757), z_dir=(0, 0, -1)), keep=Keep.TOP, mode=Mode.PRIVATE)
    fillet4_piece_18a = split(fillet4_piece_18a, bisect_by=Plane(origin=(20.152391024405656, -1.4376089755943404, -23.737569999999998), z_dir=(0, 0, 1)), keep=Keep.TOP, mode=Mode.PRIVATE)
    with BuildSketch(Plane(origin=(50.165, 0, -23.737569999999998), x_dir=(0, 0, 1), z_dir=(-1, 0, 0))) as fillet4_piece_18b_section:
        with BuildLine():
            CenterArc((FILLET4_R, -FILLET4_R), FILLET4_R, 90, 90)
            Line((0, -FILLET4_R), (-FILLET4_R * 0.02, -FILLET4_R))
            Line((-FILLET4_R * 0.02, -FILLET4_R), (-FILLET4_R * 0.02, FILLET4_R * 0.02))
            Line((-FILLET4_R * 0.02, FILLET4_R * 0.02), (FILLET4_R, FILLET4_R * 0.02))
            Line((FILLET4_R, FILLET4_R * 0.02), (FILLET4_R, 0))
        make_face()
    fillet4_piece_18b = extrude(amount=44.449999999999996, mode=Mode.PRIVATE)
    fillet4_piece_18b = split(fillet4_piece_18b, bisect_by=Plane(origin=(21.589999999999996, -1.4376089755943362, -22.299961024405654), z_dir=(-1, -1e-16, 0)), keep=Keep.TOP, mode=Mode.PRIVATE)
    fillet4_piece_18 = fillet4_piece_18a & fillet4_piece_18b
    add(fillet4_piece_18)
    with BuildSketch(Plane(origin=(50.165, 0, -45.96257), x_dir=(1, 0, 0), z_dir=(0, 0, 1))) as fillet4_piece_19a_section:
        with BuildLine():
            CenterArc((FILLET4_R, -FILLET4_R), FILLET4_R, 90, 90)
            Line((0, -FILLET4_R), (-FILLET4_R * 0.02, -FILLET4_R))
            Line((-FILLET4_R * 0.02, -FILLET4_R), (-FILLET4_R * 0.02, FILLET4_R * 0.02))
            Line((-FILLET4_R * 0.02, FILLET4_R * 0.02), (FILLET4_R, FILLET4_R * 0.02))
            Line((FILLET4_R, FILLET4_R * 0.02), (FILLET4_R, 0))
        make_face()
    fillet4_piece_19a = extrude(amount=22.225, mode=Mode.PRIVATE)
    fillet4_piece_19a = split(fillet4_piece_19a, bisect_by=Plane(origin=(51.60260897559434, -1.437608975594344, -30.08757), z_dir=(0, 0, -1)), keep=Keep.TOP, mode=Mode.PRIVATE)
    with BuildSketch(Plane(origin=(66.04, 0, -30.08757), x_dir=(0, 0, -1), z_dir=(-1, 0, 0))) as fillet4_piece_19b_section:
        with BuildLine():
            CenterArc((FILLET4_R, FILLET4_R), FILLET4_R, 180, 90)
            Line((0, FILLET4_R), (-FILLET4_R * 0.02, FILLET4_R))
            Line((-FILLET4_R * 0.02, FILLET4_R), (-FILLET4_R * 0.02, -FILLET4_R * 0.02))
            Line((-FILLET4_R * 0.02, -FILLET4_R * 0.02), (FILLET4_R, -FILLET4_R * 0.02))
            Line((FILLET4_R, -FILLET4_R * 0.02), (FILLET4_R, 0))
        make_face()
    fillet4_piece_19b = extrude(amount=44.45000000000001, mode=Mode.PRIVATE)
    fillet4_piece_19b = split(fillet4_piece_19b, bisect_by=Plane(origin=(50.165, -1.437608975594344, -31.525178975594343), z_dir=(1, 0, 0)), keep=Keep.TOP, mode=Mode.PRIVATE)
    fillet4_piece_19 = fillet4_piece_19a & fillet4_piece_19b
    add(fillet4_piece_19)
    with BuildSketch(Plane(origin=(21.589999999999996, 0, -45.962569999999985), x_dir=(-1, 0, 0), z_dir=(0, 0, 1))) as fillet4_piece_20a_section:
        with BuildLine():
            CenterArc((FILLET4_R, FILLET4_R), FILLET4_R, 180, 90)
            Line((0, FILLET4_R), (-FILLET4_R * 0.02, FILLET4_R))
            Line((-FILLET4_R * 0.02, FILLET4_R), (-FILLET4_R * 0.02, -FILLET4_R * 0.02))
            Line((-FILLET4_R * 0.02, -FILLET4_R * 0.02), (FILLET4_R, -FILLET4_R * 0.02))
            Line((FILLET4_R, -FILLET4_R * 0.02), (FILLET4_R, 0))
        make_face()
    fillet4_piece_20a = extrude(amount=22.224999999999987, mode=Mode.PRIVATE)
    fillet4_piece_20a = split(fillet4_piece_20a, bisect_by=Plane(origin=(20.152391024405656, -1.4376089755943404, -30.08757), z_dir=(0, 0, -1)), keep=Keep.TOP, mode=Mode.PRIVATE)
    with BuildSketch(Plane(origin=(50.165, 0, -30.08757), x_dir=(0, 0, -1), z_dir=(-1, 0, 0))) as fillet4_piece_20b_section:
        with BuildLine():
            CenterArc((FILLET4_R, FILLET4_R), FILLET4_R, 180, 90)
            Line((0, FILLET4_R), (-FILLET4_R * 0.02, FILLET4_R))
            Line((-FILLET4_R * 0.02, FILLET4_R), (-FILLET4_R * 0.02, -FILLET4_R * 0.02))
            Line((-FILLET4_R * 0.02, -FILLET4_R * 0.02), (FILLET4_R, -FILLET4_R * 0.02))
            Line((FILLET4_R, -FILLET4_R * 0.02), (FILLET4_R, 0))
        make_face()
    fillet4_piece_20b = extrude(amount=44.45, mode=Mode.PRIVATE)
    fillet4_piece_20b = split(fillet4_piece_20b, bisect_by=Plane(origin=(21.589999999999996, -1.4376089755943398, -31.52517897559434), z_dir=(-1, -1e-16, 0)), keep=Keep.TOP, mode=Mode.PRIVATE)
    fillet4_piece_20 = fillet4_piece_20a & fillet4_piece_20b
    add(fillet4_piece_20)

    # Fillet5
    fillet5_edges = [part.edges().sort_by_distance(p)[0] for p in [
        (50.165, -35.537499999999994, -7.862570000000001),
        (21.59, -35.537499999999994, -7.862570000000001),
        (50.165, -35.537499999999994, -26.91257),
        (21.59, -35.537499999999994, -26.91257),
    ]]
    fillet(fillet5_edges, radius=FILLET5_R)

    # Sketch13 → Cut-Extrude2 (cut, up to next)
    with BuildSketch(Plane(origin=(71.755, 0, 0), x_dir=(0, 0, -1), z_dir=(1, 0, 0)), mode=Mode.PRIVATE) as cut_extrude2_sk1:
        with Locations((75.52599999999997, 69.17499999999998)):
            Circle(SKETCH13_R)
    cut_extrude2_tool1 = extrude(cut_extrude2_sk1.sketch, amount=-CUT_EXTRUDE2_REACH, mode=Mode.PRIVATE) & part.part
    # Sketch13 → Cut-Extrude2 (cut, up to next)
    with BuildSketch(Plane(origin=(71.755, 0, 0), x_dir=(0, 0, -1), z_dir=(1, 0, 0)), mode=Mode.PRIVATE) as cut_extrude2_sk2:
        with Locations((5.525999999999962, 69.175)):
            Circle(SKETCH13_R_2)
    cut_extrude2_tool2 = extrude(cut_extrude2_sk2.sketch, amount=-CUT_EXTRUDE2_REACH, mode=Mode.PRIVATE) & part.part
    # Sketch13 → Cut-Extrude2 (cut, up to next)
    with BuildSketch(Plane(origin=(71.755, 0, 0), x_dir=(0, 0, -1), z_dir=(1, 0, 0)), mode=Mode.PRIVATE) as cut_extrude2_sk3:
        with Locations((5.525999999999962, 19.17499999999998)):
            Circle(SKETCH13_R_2)
    cut_extrude2_tool3 = extrude(cut_extrude2_sk3.sketch, amount=-CUT_EXTRUDE2_REACH, mode=Mode.PRIVATE) & part.part
    # Sketch13 → Cut-Extrude2 (cut, up to next)
    with BuildSketch(Plane(origin=(71.755, 0, 0), x_dir=(0, 0, -1), z_dir=(1, 0, 0)), mode=Mode.PRIVATE) as cut_extrude2_sk4:
        with Locations((75.52599999999997, 19.174999999999972)):
            Circle(SKETCH13_R)
    cut_extrude2_tool4 = extrude(cut_extrude2_sk4.sketch, amount=-CUT_EXTRUDE2_REACH, mode=Mode.PRIVATE) & part.part
    add(cut_extrude2_tool1.solids().sort_by_distance((71.755, 69.175, -75.526))[0], mode=Mode.SUBTRACT)
    add(cut_extrude2_tool2.solids().sort_by_distance((71.755, 69.175, -5.526))[0], mode=Mode.SUBTRACT)
    add(cut_extrude2_tool3.solids().sort_by_distance((71.755, 19.175, -5.526))[0], mode=Mode.SUBTRACT)
    add(cut_extrude2_tool4.solids().sort_by_distance((71.755, 19.175, -75.526))[0], mode=Mode.SUBTRACT)


solid = part.part
